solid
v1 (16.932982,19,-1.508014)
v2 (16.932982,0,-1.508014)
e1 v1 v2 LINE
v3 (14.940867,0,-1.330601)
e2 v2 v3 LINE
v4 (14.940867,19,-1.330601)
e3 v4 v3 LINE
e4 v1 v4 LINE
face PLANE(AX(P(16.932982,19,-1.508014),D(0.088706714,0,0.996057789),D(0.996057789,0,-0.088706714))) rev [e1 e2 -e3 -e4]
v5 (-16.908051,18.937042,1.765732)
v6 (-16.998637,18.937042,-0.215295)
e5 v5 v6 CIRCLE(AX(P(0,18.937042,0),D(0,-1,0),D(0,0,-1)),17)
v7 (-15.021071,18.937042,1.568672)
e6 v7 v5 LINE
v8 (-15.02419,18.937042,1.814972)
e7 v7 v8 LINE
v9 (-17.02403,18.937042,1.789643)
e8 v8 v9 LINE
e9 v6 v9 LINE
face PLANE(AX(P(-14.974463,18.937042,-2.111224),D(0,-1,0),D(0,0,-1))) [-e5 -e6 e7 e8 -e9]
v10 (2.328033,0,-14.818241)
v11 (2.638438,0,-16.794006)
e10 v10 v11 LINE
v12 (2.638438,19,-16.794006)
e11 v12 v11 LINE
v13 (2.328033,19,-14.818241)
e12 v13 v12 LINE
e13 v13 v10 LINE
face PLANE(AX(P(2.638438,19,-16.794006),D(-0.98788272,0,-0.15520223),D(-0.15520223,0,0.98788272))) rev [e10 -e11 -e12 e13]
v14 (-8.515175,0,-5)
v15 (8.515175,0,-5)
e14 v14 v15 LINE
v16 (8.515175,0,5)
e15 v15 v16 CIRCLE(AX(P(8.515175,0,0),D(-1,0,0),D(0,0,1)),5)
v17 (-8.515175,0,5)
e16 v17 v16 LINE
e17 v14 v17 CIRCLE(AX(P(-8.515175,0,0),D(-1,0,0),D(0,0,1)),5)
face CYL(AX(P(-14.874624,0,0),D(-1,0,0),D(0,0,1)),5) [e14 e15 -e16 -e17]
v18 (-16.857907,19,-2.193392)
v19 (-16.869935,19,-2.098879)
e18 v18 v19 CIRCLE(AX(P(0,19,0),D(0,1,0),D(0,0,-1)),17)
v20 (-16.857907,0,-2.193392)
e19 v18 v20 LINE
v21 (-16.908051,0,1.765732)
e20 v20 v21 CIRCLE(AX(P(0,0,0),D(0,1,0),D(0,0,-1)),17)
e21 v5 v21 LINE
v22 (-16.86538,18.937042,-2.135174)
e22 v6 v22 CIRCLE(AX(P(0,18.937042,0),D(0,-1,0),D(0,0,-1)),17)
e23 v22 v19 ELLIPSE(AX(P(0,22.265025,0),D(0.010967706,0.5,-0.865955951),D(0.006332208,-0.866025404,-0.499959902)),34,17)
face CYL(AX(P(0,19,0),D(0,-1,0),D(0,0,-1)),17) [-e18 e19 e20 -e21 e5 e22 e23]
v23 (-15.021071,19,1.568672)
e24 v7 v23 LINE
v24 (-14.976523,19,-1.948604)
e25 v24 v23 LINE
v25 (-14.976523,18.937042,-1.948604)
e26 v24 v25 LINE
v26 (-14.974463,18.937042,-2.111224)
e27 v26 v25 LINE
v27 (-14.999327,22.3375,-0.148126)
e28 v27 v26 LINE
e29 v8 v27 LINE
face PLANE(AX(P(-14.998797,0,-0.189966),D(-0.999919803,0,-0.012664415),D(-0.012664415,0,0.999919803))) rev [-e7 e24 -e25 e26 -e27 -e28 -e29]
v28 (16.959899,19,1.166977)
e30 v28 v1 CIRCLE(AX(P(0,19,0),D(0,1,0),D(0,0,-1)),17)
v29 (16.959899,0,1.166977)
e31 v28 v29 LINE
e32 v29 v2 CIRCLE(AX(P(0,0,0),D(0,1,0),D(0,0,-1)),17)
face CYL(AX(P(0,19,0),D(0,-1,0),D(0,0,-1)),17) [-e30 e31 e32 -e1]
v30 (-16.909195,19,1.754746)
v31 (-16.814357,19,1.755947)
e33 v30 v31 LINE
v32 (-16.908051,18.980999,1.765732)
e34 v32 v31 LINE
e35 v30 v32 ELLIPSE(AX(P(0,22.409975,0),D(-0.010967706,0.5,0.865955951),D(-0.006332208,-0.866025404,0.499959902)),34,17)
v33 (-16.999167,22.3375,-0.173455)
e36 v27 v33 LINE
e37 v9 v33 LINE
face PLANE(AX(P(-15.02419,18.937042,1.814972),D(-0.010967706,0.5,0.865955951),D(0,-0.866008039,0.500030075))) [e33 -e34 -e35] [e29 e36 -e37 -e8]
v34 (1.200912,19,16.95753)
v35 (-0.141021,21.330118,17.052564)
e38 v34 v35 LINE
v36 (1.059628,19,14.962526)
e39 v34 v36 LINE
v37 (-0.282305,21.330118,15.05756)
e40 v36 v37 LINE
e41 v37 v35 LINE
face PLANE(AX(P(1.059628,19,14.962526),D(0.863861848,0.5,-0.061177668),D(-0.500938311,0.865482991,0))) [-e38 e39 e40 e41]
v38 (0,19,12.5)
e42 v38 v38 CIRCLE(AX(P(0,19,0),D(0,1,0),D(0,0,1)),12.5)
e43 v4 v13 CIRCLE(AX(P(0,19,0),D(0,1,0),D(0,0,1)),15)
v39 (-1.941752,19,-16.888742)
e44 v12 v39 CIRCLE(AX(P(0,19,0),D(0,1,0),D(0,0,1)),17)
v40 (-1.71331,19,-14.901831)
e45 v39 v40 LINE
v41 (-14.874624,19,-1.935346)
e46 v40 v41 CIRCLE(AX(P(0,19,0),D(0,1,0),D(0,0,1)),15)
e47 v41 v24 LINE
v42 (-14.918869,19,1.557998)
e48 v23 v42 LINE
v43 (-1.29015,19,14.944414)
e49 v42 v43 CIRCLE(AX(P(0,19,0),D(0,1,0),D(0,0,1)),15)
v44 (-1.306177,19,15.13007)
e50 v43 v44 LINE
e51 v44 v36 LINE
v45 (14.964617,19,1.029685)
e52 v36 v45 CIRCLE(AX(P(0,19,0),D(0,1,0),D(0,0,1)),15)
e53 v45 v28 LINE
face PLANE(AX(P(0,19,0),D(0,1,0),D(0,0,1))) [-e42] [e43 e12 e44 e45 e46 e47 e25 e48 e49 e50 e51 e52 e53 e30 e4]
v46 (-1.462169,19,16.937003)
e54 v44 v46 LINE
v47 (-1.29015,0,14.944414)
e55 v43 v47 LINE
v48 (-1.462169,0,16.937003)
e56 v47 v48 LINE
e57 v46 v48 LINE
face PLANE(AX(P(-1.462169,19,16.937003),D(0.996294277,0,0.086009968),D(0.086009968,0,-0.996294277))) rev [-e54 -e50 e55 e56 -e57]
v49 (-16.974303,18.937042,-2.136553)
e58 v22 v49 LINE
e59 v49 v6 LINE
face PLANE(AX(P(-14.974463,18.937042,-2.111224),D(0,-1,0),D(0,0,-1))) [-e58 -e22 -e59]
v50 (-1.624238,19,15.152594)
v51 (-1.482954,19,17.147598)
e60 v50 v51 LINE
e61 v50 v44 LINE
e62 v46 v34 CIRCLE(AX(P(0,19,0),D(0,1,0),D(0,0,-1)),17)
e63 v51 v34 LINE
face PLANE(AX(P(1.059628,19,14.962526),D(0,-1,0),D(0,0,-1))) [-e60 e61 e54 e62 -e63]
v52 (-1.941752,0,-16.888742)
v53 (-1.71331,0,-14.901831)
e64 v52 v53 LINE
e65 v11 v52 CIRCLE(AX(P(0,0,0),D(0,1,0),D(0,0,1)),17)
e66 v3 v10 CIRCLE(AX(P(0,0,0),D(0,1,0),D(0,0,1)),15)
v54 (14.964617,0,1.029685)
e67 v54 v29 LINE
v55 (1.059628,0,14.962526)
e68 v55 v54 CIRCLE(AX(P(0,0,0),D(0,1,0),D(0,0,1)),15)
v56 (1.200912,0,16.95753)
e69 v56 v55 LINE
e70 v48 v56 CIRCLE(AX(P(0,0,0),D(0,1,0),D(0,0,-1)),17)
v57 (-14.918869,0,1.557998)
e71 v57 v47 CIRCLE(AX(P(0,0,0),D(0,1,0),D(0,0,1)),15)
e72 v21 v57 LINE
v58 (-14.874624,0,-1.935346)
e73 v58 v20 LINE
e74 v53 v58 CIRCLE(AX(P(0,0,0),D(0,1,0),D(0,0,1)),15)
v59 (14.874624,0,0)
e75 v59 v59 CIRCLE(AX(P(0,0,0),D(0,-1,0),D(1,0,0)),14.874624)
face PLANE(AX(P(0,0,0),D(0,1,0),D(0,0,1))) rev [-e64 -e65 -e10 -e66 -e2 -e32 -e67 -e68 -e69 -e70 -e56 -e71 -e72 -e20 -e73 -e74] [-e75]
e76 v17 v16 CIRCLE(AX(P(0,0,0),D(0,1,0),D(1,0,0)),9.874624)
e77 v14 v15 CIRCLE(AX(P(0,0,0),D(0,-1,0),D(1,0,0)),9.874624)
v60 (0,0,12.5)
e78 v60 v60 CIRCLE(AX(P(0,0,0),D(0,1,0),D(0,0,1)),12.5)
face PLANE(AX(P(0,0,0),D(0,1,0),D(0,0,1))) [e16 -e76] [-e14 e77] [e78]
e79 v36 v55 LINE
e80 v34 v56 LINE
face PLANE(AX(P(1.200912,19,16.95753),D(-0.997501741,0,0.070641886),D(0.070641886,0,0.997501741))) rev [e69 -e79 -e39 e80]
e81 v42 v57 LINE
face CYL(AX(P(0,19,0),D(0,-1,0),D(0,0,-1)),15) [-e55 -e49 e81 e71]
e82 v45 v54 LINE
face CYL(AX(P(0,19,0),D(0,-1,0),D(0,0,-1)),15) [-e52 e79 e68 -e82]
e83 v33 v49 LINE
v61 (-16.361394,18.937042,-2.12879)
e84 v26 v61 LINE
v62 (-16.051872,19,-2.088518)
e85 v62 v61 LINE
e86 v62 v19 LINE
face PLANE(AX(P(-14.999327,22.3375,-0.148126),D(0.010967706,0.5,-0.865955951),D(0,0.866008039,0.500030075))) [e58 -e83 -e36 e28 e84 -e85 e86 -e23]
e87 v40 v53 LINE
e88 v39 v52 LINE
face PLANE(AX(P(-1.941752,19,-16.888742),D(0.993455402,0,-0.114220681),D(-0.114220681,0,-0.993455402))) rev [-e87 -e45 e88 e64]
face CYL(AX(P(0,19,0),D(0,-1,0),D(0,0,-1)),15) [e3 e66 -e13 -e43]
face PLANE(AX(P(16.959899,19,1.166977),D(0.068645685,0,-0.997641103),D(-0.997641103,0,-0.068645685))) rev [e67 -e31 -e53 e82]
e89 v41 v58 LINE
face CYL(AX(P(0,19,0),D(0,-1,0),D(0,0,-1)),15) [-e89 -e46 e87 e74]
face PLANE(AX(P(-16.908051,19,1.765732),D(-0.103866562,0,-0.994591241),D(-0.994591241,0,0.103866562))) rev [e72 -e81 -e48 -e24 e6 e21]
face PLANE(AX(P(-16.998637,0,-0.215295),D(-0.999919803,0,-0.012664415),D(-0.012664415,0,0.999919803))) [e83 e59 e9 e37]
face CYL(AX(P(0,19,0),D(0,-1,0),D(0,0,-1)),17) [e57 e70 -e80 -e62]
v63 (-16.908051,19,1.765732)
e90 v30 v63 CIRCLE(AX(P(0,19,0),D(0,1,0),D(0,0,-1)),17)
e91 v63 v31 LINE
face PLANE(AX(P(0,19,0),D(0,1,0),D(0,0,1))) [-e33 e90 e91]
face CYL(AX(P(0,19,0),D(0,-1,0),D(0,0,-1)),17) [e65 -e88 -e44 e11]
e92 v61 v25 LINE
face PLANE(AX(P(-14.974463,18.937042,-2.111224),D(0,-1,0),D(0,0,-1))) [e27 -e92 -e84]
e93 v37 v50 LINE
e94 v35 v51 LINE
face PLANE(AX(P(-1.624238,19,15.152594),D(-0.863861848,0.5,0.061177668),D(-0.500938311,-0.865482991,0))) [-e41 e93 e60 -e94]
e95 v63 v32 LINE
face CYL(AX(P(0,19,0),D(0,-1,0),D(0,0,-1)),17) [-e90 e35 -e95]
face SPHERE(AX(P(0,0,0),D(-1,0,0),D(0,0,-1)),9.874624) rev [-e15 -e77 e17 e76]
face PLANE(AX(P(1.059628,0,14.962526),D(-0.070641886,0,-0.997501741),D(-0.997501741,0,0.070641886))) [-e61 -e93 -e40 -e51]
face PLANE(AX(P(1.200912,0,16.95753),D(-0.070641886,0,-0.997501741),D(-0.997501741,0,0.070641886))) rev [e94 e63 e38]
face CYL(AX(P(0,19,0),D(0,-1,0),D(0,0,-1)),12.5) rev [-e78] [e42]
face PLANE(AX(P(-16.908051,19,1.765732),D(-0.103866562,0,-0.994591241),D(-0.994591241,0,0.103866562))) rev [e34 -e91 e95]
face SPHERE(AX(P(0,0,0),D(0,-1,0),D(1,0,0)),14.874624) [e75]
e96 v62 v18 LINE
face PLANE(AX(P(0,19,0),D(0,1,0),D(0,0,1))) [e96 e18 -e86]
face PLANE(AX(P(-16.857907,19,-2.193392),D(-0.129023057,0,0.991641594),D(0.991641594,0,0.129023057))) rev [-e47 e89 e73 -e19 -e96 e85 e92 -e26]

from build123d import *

# Parameters (mm, degrees)
SKETCH1_R           = 12.5
BOSS_EXTRUDE1_DEPTH = 19
REVOLVE_THIN8_ANGLE = 180
BOSS_EXTRUDE4_DEPTH = 2
BOSS_EXTRUDE5_DEPTH = 2


# Read off the part's stored shape, not the designer's step: Revolve-Thin8
with BuildPart() as part:
    # Sketch1 → Boss-Extrude1 (new body)
    with BuildSketch(Plane(origin=(0, 0, 0), x_dir=(1, 0, 0), z_dir=(0, 1, 0))):
        with BuildLine():
            Line((-16.857907097, 2.193391967), (-14.874623909, 1.935345853))
            ThreePointArc((-14.874623909, 1.935345853), (-10.527218249, 10.68539545), (-1.713310211, 14.901831032))
            Line((-1.713310211, 14.901831032), (-1.941751573, 16.888741837))
            ThreePointArc((-1.941751573, 16.888741837), (0.351548962, 16.996364709), (2.638437912, 16.794006234))
            Line((2.638437912, 16.794006234), (2.328033452, 14.818240795))
            ThreePointArc((2.328033452, 14.818240795), (10.955949894, 10.245348306), (14.940866835, 1.330600703))
            Line((14.940866835, 1.330600703), (16.932982413, 1.50801413))
            ThreePointArc((16.932982413, 1.50801413), (16.999139456, 0.171049014), (16.959898748, -1.166976638))
            Line((16.959898748, -1.166976638), (14.964616542, -1.029685269))
            ThreePointArc((14.964616542, -1.029685269), (10.617208635, -10.595984183), (1.059628295, -14.962526119))
            Line((1.059628295, -14.962526119), (1.200912068, -16.957529602))
            ThreePointArc((1.200912068, -16.957529602), (-0.131031268, -16.999495016), (-1.462169449, -16.937002701))
            Line((-1.462169449, -16.937002701), (-1.290149514, -14.944414148))
            ThreePointArc((-1.290149514, -14.944414148), (-10.511046509, -10.701303719), (-14.91886862, -1.557998423))
            Line((-14.91886862, -1.557998423), (-16.908051103, -1.765731546))
            ThreePointArc((-16.908051103, -1.765731546), (-16.998636652, 0.215295063), (-16.857907097, 2.193391967))
        make_face()
        with Locations(Location((0, 0, 0), (0, 0, 270))):
            Circle(SKETCH1_R, mode=Mode.SUBTRACT)
    extrude(amount=BOSS_EXTRUDE1_DEPTH)

    # Revolve-Thin8 outline → Revolve-Thin8 (revolve)
    with BuildSketch(Plane.ZX):
        with BuildLine():
            ThreePointArc((0, -14.874623909), (14.874623909, 0), (0, 14.874623909))
            Line((0, 14.874623909), (0, -14.874623909))
        make_face()
        with BuildLine():
            Line((5, -8.515174534), (5, 8.515174534))
            ThreePointArc((5, 8.515174534), (9.874623909, 0), (5, -8.515174534))
        make_face(mode=Mode.SUBTRACT)
    revolve(axis=Axis((0, 0, 0), (1, 0, 0)), revolution_arc=REVOLVE_THIN8_ANGLE)

    # Sketch6 → Boss-Extrude4 (add)
    with BuildSketch(Plane(origin=(1.200912068, 9.5, 16.957529602), x_dir=(0.9975017412997444, 0, -0.0706418863279974), z_dir=(0.0706418863279974, 0, 0.9975017412997444))):
        Polygon((0, 9.5), (-1.345294106, 11.830117743), (-2.690588212, 9.5), align=None)
    extrude(amount=-BOSS_EXTRUDE4_DEPTH)

    # Sketch7 → Boss-Extrude5 (add)
    with BuildSketch(Plane(origin=(-16.998636652, 0, -0.215295063), x_dir=(-0.012664415486466005, 0, 0.9999198030744196), z_dir=(-0.9999198030744197, 0, -0.012664415486466006))):
        Polygon((-1.921412098, 18.937041844), (2.005099018, 18.937041844), (0.04184346, 22.337500219), align=None)
    extrude(amount=-BOSS_EXTRUDE5_DEPTH)


solid = part.part
